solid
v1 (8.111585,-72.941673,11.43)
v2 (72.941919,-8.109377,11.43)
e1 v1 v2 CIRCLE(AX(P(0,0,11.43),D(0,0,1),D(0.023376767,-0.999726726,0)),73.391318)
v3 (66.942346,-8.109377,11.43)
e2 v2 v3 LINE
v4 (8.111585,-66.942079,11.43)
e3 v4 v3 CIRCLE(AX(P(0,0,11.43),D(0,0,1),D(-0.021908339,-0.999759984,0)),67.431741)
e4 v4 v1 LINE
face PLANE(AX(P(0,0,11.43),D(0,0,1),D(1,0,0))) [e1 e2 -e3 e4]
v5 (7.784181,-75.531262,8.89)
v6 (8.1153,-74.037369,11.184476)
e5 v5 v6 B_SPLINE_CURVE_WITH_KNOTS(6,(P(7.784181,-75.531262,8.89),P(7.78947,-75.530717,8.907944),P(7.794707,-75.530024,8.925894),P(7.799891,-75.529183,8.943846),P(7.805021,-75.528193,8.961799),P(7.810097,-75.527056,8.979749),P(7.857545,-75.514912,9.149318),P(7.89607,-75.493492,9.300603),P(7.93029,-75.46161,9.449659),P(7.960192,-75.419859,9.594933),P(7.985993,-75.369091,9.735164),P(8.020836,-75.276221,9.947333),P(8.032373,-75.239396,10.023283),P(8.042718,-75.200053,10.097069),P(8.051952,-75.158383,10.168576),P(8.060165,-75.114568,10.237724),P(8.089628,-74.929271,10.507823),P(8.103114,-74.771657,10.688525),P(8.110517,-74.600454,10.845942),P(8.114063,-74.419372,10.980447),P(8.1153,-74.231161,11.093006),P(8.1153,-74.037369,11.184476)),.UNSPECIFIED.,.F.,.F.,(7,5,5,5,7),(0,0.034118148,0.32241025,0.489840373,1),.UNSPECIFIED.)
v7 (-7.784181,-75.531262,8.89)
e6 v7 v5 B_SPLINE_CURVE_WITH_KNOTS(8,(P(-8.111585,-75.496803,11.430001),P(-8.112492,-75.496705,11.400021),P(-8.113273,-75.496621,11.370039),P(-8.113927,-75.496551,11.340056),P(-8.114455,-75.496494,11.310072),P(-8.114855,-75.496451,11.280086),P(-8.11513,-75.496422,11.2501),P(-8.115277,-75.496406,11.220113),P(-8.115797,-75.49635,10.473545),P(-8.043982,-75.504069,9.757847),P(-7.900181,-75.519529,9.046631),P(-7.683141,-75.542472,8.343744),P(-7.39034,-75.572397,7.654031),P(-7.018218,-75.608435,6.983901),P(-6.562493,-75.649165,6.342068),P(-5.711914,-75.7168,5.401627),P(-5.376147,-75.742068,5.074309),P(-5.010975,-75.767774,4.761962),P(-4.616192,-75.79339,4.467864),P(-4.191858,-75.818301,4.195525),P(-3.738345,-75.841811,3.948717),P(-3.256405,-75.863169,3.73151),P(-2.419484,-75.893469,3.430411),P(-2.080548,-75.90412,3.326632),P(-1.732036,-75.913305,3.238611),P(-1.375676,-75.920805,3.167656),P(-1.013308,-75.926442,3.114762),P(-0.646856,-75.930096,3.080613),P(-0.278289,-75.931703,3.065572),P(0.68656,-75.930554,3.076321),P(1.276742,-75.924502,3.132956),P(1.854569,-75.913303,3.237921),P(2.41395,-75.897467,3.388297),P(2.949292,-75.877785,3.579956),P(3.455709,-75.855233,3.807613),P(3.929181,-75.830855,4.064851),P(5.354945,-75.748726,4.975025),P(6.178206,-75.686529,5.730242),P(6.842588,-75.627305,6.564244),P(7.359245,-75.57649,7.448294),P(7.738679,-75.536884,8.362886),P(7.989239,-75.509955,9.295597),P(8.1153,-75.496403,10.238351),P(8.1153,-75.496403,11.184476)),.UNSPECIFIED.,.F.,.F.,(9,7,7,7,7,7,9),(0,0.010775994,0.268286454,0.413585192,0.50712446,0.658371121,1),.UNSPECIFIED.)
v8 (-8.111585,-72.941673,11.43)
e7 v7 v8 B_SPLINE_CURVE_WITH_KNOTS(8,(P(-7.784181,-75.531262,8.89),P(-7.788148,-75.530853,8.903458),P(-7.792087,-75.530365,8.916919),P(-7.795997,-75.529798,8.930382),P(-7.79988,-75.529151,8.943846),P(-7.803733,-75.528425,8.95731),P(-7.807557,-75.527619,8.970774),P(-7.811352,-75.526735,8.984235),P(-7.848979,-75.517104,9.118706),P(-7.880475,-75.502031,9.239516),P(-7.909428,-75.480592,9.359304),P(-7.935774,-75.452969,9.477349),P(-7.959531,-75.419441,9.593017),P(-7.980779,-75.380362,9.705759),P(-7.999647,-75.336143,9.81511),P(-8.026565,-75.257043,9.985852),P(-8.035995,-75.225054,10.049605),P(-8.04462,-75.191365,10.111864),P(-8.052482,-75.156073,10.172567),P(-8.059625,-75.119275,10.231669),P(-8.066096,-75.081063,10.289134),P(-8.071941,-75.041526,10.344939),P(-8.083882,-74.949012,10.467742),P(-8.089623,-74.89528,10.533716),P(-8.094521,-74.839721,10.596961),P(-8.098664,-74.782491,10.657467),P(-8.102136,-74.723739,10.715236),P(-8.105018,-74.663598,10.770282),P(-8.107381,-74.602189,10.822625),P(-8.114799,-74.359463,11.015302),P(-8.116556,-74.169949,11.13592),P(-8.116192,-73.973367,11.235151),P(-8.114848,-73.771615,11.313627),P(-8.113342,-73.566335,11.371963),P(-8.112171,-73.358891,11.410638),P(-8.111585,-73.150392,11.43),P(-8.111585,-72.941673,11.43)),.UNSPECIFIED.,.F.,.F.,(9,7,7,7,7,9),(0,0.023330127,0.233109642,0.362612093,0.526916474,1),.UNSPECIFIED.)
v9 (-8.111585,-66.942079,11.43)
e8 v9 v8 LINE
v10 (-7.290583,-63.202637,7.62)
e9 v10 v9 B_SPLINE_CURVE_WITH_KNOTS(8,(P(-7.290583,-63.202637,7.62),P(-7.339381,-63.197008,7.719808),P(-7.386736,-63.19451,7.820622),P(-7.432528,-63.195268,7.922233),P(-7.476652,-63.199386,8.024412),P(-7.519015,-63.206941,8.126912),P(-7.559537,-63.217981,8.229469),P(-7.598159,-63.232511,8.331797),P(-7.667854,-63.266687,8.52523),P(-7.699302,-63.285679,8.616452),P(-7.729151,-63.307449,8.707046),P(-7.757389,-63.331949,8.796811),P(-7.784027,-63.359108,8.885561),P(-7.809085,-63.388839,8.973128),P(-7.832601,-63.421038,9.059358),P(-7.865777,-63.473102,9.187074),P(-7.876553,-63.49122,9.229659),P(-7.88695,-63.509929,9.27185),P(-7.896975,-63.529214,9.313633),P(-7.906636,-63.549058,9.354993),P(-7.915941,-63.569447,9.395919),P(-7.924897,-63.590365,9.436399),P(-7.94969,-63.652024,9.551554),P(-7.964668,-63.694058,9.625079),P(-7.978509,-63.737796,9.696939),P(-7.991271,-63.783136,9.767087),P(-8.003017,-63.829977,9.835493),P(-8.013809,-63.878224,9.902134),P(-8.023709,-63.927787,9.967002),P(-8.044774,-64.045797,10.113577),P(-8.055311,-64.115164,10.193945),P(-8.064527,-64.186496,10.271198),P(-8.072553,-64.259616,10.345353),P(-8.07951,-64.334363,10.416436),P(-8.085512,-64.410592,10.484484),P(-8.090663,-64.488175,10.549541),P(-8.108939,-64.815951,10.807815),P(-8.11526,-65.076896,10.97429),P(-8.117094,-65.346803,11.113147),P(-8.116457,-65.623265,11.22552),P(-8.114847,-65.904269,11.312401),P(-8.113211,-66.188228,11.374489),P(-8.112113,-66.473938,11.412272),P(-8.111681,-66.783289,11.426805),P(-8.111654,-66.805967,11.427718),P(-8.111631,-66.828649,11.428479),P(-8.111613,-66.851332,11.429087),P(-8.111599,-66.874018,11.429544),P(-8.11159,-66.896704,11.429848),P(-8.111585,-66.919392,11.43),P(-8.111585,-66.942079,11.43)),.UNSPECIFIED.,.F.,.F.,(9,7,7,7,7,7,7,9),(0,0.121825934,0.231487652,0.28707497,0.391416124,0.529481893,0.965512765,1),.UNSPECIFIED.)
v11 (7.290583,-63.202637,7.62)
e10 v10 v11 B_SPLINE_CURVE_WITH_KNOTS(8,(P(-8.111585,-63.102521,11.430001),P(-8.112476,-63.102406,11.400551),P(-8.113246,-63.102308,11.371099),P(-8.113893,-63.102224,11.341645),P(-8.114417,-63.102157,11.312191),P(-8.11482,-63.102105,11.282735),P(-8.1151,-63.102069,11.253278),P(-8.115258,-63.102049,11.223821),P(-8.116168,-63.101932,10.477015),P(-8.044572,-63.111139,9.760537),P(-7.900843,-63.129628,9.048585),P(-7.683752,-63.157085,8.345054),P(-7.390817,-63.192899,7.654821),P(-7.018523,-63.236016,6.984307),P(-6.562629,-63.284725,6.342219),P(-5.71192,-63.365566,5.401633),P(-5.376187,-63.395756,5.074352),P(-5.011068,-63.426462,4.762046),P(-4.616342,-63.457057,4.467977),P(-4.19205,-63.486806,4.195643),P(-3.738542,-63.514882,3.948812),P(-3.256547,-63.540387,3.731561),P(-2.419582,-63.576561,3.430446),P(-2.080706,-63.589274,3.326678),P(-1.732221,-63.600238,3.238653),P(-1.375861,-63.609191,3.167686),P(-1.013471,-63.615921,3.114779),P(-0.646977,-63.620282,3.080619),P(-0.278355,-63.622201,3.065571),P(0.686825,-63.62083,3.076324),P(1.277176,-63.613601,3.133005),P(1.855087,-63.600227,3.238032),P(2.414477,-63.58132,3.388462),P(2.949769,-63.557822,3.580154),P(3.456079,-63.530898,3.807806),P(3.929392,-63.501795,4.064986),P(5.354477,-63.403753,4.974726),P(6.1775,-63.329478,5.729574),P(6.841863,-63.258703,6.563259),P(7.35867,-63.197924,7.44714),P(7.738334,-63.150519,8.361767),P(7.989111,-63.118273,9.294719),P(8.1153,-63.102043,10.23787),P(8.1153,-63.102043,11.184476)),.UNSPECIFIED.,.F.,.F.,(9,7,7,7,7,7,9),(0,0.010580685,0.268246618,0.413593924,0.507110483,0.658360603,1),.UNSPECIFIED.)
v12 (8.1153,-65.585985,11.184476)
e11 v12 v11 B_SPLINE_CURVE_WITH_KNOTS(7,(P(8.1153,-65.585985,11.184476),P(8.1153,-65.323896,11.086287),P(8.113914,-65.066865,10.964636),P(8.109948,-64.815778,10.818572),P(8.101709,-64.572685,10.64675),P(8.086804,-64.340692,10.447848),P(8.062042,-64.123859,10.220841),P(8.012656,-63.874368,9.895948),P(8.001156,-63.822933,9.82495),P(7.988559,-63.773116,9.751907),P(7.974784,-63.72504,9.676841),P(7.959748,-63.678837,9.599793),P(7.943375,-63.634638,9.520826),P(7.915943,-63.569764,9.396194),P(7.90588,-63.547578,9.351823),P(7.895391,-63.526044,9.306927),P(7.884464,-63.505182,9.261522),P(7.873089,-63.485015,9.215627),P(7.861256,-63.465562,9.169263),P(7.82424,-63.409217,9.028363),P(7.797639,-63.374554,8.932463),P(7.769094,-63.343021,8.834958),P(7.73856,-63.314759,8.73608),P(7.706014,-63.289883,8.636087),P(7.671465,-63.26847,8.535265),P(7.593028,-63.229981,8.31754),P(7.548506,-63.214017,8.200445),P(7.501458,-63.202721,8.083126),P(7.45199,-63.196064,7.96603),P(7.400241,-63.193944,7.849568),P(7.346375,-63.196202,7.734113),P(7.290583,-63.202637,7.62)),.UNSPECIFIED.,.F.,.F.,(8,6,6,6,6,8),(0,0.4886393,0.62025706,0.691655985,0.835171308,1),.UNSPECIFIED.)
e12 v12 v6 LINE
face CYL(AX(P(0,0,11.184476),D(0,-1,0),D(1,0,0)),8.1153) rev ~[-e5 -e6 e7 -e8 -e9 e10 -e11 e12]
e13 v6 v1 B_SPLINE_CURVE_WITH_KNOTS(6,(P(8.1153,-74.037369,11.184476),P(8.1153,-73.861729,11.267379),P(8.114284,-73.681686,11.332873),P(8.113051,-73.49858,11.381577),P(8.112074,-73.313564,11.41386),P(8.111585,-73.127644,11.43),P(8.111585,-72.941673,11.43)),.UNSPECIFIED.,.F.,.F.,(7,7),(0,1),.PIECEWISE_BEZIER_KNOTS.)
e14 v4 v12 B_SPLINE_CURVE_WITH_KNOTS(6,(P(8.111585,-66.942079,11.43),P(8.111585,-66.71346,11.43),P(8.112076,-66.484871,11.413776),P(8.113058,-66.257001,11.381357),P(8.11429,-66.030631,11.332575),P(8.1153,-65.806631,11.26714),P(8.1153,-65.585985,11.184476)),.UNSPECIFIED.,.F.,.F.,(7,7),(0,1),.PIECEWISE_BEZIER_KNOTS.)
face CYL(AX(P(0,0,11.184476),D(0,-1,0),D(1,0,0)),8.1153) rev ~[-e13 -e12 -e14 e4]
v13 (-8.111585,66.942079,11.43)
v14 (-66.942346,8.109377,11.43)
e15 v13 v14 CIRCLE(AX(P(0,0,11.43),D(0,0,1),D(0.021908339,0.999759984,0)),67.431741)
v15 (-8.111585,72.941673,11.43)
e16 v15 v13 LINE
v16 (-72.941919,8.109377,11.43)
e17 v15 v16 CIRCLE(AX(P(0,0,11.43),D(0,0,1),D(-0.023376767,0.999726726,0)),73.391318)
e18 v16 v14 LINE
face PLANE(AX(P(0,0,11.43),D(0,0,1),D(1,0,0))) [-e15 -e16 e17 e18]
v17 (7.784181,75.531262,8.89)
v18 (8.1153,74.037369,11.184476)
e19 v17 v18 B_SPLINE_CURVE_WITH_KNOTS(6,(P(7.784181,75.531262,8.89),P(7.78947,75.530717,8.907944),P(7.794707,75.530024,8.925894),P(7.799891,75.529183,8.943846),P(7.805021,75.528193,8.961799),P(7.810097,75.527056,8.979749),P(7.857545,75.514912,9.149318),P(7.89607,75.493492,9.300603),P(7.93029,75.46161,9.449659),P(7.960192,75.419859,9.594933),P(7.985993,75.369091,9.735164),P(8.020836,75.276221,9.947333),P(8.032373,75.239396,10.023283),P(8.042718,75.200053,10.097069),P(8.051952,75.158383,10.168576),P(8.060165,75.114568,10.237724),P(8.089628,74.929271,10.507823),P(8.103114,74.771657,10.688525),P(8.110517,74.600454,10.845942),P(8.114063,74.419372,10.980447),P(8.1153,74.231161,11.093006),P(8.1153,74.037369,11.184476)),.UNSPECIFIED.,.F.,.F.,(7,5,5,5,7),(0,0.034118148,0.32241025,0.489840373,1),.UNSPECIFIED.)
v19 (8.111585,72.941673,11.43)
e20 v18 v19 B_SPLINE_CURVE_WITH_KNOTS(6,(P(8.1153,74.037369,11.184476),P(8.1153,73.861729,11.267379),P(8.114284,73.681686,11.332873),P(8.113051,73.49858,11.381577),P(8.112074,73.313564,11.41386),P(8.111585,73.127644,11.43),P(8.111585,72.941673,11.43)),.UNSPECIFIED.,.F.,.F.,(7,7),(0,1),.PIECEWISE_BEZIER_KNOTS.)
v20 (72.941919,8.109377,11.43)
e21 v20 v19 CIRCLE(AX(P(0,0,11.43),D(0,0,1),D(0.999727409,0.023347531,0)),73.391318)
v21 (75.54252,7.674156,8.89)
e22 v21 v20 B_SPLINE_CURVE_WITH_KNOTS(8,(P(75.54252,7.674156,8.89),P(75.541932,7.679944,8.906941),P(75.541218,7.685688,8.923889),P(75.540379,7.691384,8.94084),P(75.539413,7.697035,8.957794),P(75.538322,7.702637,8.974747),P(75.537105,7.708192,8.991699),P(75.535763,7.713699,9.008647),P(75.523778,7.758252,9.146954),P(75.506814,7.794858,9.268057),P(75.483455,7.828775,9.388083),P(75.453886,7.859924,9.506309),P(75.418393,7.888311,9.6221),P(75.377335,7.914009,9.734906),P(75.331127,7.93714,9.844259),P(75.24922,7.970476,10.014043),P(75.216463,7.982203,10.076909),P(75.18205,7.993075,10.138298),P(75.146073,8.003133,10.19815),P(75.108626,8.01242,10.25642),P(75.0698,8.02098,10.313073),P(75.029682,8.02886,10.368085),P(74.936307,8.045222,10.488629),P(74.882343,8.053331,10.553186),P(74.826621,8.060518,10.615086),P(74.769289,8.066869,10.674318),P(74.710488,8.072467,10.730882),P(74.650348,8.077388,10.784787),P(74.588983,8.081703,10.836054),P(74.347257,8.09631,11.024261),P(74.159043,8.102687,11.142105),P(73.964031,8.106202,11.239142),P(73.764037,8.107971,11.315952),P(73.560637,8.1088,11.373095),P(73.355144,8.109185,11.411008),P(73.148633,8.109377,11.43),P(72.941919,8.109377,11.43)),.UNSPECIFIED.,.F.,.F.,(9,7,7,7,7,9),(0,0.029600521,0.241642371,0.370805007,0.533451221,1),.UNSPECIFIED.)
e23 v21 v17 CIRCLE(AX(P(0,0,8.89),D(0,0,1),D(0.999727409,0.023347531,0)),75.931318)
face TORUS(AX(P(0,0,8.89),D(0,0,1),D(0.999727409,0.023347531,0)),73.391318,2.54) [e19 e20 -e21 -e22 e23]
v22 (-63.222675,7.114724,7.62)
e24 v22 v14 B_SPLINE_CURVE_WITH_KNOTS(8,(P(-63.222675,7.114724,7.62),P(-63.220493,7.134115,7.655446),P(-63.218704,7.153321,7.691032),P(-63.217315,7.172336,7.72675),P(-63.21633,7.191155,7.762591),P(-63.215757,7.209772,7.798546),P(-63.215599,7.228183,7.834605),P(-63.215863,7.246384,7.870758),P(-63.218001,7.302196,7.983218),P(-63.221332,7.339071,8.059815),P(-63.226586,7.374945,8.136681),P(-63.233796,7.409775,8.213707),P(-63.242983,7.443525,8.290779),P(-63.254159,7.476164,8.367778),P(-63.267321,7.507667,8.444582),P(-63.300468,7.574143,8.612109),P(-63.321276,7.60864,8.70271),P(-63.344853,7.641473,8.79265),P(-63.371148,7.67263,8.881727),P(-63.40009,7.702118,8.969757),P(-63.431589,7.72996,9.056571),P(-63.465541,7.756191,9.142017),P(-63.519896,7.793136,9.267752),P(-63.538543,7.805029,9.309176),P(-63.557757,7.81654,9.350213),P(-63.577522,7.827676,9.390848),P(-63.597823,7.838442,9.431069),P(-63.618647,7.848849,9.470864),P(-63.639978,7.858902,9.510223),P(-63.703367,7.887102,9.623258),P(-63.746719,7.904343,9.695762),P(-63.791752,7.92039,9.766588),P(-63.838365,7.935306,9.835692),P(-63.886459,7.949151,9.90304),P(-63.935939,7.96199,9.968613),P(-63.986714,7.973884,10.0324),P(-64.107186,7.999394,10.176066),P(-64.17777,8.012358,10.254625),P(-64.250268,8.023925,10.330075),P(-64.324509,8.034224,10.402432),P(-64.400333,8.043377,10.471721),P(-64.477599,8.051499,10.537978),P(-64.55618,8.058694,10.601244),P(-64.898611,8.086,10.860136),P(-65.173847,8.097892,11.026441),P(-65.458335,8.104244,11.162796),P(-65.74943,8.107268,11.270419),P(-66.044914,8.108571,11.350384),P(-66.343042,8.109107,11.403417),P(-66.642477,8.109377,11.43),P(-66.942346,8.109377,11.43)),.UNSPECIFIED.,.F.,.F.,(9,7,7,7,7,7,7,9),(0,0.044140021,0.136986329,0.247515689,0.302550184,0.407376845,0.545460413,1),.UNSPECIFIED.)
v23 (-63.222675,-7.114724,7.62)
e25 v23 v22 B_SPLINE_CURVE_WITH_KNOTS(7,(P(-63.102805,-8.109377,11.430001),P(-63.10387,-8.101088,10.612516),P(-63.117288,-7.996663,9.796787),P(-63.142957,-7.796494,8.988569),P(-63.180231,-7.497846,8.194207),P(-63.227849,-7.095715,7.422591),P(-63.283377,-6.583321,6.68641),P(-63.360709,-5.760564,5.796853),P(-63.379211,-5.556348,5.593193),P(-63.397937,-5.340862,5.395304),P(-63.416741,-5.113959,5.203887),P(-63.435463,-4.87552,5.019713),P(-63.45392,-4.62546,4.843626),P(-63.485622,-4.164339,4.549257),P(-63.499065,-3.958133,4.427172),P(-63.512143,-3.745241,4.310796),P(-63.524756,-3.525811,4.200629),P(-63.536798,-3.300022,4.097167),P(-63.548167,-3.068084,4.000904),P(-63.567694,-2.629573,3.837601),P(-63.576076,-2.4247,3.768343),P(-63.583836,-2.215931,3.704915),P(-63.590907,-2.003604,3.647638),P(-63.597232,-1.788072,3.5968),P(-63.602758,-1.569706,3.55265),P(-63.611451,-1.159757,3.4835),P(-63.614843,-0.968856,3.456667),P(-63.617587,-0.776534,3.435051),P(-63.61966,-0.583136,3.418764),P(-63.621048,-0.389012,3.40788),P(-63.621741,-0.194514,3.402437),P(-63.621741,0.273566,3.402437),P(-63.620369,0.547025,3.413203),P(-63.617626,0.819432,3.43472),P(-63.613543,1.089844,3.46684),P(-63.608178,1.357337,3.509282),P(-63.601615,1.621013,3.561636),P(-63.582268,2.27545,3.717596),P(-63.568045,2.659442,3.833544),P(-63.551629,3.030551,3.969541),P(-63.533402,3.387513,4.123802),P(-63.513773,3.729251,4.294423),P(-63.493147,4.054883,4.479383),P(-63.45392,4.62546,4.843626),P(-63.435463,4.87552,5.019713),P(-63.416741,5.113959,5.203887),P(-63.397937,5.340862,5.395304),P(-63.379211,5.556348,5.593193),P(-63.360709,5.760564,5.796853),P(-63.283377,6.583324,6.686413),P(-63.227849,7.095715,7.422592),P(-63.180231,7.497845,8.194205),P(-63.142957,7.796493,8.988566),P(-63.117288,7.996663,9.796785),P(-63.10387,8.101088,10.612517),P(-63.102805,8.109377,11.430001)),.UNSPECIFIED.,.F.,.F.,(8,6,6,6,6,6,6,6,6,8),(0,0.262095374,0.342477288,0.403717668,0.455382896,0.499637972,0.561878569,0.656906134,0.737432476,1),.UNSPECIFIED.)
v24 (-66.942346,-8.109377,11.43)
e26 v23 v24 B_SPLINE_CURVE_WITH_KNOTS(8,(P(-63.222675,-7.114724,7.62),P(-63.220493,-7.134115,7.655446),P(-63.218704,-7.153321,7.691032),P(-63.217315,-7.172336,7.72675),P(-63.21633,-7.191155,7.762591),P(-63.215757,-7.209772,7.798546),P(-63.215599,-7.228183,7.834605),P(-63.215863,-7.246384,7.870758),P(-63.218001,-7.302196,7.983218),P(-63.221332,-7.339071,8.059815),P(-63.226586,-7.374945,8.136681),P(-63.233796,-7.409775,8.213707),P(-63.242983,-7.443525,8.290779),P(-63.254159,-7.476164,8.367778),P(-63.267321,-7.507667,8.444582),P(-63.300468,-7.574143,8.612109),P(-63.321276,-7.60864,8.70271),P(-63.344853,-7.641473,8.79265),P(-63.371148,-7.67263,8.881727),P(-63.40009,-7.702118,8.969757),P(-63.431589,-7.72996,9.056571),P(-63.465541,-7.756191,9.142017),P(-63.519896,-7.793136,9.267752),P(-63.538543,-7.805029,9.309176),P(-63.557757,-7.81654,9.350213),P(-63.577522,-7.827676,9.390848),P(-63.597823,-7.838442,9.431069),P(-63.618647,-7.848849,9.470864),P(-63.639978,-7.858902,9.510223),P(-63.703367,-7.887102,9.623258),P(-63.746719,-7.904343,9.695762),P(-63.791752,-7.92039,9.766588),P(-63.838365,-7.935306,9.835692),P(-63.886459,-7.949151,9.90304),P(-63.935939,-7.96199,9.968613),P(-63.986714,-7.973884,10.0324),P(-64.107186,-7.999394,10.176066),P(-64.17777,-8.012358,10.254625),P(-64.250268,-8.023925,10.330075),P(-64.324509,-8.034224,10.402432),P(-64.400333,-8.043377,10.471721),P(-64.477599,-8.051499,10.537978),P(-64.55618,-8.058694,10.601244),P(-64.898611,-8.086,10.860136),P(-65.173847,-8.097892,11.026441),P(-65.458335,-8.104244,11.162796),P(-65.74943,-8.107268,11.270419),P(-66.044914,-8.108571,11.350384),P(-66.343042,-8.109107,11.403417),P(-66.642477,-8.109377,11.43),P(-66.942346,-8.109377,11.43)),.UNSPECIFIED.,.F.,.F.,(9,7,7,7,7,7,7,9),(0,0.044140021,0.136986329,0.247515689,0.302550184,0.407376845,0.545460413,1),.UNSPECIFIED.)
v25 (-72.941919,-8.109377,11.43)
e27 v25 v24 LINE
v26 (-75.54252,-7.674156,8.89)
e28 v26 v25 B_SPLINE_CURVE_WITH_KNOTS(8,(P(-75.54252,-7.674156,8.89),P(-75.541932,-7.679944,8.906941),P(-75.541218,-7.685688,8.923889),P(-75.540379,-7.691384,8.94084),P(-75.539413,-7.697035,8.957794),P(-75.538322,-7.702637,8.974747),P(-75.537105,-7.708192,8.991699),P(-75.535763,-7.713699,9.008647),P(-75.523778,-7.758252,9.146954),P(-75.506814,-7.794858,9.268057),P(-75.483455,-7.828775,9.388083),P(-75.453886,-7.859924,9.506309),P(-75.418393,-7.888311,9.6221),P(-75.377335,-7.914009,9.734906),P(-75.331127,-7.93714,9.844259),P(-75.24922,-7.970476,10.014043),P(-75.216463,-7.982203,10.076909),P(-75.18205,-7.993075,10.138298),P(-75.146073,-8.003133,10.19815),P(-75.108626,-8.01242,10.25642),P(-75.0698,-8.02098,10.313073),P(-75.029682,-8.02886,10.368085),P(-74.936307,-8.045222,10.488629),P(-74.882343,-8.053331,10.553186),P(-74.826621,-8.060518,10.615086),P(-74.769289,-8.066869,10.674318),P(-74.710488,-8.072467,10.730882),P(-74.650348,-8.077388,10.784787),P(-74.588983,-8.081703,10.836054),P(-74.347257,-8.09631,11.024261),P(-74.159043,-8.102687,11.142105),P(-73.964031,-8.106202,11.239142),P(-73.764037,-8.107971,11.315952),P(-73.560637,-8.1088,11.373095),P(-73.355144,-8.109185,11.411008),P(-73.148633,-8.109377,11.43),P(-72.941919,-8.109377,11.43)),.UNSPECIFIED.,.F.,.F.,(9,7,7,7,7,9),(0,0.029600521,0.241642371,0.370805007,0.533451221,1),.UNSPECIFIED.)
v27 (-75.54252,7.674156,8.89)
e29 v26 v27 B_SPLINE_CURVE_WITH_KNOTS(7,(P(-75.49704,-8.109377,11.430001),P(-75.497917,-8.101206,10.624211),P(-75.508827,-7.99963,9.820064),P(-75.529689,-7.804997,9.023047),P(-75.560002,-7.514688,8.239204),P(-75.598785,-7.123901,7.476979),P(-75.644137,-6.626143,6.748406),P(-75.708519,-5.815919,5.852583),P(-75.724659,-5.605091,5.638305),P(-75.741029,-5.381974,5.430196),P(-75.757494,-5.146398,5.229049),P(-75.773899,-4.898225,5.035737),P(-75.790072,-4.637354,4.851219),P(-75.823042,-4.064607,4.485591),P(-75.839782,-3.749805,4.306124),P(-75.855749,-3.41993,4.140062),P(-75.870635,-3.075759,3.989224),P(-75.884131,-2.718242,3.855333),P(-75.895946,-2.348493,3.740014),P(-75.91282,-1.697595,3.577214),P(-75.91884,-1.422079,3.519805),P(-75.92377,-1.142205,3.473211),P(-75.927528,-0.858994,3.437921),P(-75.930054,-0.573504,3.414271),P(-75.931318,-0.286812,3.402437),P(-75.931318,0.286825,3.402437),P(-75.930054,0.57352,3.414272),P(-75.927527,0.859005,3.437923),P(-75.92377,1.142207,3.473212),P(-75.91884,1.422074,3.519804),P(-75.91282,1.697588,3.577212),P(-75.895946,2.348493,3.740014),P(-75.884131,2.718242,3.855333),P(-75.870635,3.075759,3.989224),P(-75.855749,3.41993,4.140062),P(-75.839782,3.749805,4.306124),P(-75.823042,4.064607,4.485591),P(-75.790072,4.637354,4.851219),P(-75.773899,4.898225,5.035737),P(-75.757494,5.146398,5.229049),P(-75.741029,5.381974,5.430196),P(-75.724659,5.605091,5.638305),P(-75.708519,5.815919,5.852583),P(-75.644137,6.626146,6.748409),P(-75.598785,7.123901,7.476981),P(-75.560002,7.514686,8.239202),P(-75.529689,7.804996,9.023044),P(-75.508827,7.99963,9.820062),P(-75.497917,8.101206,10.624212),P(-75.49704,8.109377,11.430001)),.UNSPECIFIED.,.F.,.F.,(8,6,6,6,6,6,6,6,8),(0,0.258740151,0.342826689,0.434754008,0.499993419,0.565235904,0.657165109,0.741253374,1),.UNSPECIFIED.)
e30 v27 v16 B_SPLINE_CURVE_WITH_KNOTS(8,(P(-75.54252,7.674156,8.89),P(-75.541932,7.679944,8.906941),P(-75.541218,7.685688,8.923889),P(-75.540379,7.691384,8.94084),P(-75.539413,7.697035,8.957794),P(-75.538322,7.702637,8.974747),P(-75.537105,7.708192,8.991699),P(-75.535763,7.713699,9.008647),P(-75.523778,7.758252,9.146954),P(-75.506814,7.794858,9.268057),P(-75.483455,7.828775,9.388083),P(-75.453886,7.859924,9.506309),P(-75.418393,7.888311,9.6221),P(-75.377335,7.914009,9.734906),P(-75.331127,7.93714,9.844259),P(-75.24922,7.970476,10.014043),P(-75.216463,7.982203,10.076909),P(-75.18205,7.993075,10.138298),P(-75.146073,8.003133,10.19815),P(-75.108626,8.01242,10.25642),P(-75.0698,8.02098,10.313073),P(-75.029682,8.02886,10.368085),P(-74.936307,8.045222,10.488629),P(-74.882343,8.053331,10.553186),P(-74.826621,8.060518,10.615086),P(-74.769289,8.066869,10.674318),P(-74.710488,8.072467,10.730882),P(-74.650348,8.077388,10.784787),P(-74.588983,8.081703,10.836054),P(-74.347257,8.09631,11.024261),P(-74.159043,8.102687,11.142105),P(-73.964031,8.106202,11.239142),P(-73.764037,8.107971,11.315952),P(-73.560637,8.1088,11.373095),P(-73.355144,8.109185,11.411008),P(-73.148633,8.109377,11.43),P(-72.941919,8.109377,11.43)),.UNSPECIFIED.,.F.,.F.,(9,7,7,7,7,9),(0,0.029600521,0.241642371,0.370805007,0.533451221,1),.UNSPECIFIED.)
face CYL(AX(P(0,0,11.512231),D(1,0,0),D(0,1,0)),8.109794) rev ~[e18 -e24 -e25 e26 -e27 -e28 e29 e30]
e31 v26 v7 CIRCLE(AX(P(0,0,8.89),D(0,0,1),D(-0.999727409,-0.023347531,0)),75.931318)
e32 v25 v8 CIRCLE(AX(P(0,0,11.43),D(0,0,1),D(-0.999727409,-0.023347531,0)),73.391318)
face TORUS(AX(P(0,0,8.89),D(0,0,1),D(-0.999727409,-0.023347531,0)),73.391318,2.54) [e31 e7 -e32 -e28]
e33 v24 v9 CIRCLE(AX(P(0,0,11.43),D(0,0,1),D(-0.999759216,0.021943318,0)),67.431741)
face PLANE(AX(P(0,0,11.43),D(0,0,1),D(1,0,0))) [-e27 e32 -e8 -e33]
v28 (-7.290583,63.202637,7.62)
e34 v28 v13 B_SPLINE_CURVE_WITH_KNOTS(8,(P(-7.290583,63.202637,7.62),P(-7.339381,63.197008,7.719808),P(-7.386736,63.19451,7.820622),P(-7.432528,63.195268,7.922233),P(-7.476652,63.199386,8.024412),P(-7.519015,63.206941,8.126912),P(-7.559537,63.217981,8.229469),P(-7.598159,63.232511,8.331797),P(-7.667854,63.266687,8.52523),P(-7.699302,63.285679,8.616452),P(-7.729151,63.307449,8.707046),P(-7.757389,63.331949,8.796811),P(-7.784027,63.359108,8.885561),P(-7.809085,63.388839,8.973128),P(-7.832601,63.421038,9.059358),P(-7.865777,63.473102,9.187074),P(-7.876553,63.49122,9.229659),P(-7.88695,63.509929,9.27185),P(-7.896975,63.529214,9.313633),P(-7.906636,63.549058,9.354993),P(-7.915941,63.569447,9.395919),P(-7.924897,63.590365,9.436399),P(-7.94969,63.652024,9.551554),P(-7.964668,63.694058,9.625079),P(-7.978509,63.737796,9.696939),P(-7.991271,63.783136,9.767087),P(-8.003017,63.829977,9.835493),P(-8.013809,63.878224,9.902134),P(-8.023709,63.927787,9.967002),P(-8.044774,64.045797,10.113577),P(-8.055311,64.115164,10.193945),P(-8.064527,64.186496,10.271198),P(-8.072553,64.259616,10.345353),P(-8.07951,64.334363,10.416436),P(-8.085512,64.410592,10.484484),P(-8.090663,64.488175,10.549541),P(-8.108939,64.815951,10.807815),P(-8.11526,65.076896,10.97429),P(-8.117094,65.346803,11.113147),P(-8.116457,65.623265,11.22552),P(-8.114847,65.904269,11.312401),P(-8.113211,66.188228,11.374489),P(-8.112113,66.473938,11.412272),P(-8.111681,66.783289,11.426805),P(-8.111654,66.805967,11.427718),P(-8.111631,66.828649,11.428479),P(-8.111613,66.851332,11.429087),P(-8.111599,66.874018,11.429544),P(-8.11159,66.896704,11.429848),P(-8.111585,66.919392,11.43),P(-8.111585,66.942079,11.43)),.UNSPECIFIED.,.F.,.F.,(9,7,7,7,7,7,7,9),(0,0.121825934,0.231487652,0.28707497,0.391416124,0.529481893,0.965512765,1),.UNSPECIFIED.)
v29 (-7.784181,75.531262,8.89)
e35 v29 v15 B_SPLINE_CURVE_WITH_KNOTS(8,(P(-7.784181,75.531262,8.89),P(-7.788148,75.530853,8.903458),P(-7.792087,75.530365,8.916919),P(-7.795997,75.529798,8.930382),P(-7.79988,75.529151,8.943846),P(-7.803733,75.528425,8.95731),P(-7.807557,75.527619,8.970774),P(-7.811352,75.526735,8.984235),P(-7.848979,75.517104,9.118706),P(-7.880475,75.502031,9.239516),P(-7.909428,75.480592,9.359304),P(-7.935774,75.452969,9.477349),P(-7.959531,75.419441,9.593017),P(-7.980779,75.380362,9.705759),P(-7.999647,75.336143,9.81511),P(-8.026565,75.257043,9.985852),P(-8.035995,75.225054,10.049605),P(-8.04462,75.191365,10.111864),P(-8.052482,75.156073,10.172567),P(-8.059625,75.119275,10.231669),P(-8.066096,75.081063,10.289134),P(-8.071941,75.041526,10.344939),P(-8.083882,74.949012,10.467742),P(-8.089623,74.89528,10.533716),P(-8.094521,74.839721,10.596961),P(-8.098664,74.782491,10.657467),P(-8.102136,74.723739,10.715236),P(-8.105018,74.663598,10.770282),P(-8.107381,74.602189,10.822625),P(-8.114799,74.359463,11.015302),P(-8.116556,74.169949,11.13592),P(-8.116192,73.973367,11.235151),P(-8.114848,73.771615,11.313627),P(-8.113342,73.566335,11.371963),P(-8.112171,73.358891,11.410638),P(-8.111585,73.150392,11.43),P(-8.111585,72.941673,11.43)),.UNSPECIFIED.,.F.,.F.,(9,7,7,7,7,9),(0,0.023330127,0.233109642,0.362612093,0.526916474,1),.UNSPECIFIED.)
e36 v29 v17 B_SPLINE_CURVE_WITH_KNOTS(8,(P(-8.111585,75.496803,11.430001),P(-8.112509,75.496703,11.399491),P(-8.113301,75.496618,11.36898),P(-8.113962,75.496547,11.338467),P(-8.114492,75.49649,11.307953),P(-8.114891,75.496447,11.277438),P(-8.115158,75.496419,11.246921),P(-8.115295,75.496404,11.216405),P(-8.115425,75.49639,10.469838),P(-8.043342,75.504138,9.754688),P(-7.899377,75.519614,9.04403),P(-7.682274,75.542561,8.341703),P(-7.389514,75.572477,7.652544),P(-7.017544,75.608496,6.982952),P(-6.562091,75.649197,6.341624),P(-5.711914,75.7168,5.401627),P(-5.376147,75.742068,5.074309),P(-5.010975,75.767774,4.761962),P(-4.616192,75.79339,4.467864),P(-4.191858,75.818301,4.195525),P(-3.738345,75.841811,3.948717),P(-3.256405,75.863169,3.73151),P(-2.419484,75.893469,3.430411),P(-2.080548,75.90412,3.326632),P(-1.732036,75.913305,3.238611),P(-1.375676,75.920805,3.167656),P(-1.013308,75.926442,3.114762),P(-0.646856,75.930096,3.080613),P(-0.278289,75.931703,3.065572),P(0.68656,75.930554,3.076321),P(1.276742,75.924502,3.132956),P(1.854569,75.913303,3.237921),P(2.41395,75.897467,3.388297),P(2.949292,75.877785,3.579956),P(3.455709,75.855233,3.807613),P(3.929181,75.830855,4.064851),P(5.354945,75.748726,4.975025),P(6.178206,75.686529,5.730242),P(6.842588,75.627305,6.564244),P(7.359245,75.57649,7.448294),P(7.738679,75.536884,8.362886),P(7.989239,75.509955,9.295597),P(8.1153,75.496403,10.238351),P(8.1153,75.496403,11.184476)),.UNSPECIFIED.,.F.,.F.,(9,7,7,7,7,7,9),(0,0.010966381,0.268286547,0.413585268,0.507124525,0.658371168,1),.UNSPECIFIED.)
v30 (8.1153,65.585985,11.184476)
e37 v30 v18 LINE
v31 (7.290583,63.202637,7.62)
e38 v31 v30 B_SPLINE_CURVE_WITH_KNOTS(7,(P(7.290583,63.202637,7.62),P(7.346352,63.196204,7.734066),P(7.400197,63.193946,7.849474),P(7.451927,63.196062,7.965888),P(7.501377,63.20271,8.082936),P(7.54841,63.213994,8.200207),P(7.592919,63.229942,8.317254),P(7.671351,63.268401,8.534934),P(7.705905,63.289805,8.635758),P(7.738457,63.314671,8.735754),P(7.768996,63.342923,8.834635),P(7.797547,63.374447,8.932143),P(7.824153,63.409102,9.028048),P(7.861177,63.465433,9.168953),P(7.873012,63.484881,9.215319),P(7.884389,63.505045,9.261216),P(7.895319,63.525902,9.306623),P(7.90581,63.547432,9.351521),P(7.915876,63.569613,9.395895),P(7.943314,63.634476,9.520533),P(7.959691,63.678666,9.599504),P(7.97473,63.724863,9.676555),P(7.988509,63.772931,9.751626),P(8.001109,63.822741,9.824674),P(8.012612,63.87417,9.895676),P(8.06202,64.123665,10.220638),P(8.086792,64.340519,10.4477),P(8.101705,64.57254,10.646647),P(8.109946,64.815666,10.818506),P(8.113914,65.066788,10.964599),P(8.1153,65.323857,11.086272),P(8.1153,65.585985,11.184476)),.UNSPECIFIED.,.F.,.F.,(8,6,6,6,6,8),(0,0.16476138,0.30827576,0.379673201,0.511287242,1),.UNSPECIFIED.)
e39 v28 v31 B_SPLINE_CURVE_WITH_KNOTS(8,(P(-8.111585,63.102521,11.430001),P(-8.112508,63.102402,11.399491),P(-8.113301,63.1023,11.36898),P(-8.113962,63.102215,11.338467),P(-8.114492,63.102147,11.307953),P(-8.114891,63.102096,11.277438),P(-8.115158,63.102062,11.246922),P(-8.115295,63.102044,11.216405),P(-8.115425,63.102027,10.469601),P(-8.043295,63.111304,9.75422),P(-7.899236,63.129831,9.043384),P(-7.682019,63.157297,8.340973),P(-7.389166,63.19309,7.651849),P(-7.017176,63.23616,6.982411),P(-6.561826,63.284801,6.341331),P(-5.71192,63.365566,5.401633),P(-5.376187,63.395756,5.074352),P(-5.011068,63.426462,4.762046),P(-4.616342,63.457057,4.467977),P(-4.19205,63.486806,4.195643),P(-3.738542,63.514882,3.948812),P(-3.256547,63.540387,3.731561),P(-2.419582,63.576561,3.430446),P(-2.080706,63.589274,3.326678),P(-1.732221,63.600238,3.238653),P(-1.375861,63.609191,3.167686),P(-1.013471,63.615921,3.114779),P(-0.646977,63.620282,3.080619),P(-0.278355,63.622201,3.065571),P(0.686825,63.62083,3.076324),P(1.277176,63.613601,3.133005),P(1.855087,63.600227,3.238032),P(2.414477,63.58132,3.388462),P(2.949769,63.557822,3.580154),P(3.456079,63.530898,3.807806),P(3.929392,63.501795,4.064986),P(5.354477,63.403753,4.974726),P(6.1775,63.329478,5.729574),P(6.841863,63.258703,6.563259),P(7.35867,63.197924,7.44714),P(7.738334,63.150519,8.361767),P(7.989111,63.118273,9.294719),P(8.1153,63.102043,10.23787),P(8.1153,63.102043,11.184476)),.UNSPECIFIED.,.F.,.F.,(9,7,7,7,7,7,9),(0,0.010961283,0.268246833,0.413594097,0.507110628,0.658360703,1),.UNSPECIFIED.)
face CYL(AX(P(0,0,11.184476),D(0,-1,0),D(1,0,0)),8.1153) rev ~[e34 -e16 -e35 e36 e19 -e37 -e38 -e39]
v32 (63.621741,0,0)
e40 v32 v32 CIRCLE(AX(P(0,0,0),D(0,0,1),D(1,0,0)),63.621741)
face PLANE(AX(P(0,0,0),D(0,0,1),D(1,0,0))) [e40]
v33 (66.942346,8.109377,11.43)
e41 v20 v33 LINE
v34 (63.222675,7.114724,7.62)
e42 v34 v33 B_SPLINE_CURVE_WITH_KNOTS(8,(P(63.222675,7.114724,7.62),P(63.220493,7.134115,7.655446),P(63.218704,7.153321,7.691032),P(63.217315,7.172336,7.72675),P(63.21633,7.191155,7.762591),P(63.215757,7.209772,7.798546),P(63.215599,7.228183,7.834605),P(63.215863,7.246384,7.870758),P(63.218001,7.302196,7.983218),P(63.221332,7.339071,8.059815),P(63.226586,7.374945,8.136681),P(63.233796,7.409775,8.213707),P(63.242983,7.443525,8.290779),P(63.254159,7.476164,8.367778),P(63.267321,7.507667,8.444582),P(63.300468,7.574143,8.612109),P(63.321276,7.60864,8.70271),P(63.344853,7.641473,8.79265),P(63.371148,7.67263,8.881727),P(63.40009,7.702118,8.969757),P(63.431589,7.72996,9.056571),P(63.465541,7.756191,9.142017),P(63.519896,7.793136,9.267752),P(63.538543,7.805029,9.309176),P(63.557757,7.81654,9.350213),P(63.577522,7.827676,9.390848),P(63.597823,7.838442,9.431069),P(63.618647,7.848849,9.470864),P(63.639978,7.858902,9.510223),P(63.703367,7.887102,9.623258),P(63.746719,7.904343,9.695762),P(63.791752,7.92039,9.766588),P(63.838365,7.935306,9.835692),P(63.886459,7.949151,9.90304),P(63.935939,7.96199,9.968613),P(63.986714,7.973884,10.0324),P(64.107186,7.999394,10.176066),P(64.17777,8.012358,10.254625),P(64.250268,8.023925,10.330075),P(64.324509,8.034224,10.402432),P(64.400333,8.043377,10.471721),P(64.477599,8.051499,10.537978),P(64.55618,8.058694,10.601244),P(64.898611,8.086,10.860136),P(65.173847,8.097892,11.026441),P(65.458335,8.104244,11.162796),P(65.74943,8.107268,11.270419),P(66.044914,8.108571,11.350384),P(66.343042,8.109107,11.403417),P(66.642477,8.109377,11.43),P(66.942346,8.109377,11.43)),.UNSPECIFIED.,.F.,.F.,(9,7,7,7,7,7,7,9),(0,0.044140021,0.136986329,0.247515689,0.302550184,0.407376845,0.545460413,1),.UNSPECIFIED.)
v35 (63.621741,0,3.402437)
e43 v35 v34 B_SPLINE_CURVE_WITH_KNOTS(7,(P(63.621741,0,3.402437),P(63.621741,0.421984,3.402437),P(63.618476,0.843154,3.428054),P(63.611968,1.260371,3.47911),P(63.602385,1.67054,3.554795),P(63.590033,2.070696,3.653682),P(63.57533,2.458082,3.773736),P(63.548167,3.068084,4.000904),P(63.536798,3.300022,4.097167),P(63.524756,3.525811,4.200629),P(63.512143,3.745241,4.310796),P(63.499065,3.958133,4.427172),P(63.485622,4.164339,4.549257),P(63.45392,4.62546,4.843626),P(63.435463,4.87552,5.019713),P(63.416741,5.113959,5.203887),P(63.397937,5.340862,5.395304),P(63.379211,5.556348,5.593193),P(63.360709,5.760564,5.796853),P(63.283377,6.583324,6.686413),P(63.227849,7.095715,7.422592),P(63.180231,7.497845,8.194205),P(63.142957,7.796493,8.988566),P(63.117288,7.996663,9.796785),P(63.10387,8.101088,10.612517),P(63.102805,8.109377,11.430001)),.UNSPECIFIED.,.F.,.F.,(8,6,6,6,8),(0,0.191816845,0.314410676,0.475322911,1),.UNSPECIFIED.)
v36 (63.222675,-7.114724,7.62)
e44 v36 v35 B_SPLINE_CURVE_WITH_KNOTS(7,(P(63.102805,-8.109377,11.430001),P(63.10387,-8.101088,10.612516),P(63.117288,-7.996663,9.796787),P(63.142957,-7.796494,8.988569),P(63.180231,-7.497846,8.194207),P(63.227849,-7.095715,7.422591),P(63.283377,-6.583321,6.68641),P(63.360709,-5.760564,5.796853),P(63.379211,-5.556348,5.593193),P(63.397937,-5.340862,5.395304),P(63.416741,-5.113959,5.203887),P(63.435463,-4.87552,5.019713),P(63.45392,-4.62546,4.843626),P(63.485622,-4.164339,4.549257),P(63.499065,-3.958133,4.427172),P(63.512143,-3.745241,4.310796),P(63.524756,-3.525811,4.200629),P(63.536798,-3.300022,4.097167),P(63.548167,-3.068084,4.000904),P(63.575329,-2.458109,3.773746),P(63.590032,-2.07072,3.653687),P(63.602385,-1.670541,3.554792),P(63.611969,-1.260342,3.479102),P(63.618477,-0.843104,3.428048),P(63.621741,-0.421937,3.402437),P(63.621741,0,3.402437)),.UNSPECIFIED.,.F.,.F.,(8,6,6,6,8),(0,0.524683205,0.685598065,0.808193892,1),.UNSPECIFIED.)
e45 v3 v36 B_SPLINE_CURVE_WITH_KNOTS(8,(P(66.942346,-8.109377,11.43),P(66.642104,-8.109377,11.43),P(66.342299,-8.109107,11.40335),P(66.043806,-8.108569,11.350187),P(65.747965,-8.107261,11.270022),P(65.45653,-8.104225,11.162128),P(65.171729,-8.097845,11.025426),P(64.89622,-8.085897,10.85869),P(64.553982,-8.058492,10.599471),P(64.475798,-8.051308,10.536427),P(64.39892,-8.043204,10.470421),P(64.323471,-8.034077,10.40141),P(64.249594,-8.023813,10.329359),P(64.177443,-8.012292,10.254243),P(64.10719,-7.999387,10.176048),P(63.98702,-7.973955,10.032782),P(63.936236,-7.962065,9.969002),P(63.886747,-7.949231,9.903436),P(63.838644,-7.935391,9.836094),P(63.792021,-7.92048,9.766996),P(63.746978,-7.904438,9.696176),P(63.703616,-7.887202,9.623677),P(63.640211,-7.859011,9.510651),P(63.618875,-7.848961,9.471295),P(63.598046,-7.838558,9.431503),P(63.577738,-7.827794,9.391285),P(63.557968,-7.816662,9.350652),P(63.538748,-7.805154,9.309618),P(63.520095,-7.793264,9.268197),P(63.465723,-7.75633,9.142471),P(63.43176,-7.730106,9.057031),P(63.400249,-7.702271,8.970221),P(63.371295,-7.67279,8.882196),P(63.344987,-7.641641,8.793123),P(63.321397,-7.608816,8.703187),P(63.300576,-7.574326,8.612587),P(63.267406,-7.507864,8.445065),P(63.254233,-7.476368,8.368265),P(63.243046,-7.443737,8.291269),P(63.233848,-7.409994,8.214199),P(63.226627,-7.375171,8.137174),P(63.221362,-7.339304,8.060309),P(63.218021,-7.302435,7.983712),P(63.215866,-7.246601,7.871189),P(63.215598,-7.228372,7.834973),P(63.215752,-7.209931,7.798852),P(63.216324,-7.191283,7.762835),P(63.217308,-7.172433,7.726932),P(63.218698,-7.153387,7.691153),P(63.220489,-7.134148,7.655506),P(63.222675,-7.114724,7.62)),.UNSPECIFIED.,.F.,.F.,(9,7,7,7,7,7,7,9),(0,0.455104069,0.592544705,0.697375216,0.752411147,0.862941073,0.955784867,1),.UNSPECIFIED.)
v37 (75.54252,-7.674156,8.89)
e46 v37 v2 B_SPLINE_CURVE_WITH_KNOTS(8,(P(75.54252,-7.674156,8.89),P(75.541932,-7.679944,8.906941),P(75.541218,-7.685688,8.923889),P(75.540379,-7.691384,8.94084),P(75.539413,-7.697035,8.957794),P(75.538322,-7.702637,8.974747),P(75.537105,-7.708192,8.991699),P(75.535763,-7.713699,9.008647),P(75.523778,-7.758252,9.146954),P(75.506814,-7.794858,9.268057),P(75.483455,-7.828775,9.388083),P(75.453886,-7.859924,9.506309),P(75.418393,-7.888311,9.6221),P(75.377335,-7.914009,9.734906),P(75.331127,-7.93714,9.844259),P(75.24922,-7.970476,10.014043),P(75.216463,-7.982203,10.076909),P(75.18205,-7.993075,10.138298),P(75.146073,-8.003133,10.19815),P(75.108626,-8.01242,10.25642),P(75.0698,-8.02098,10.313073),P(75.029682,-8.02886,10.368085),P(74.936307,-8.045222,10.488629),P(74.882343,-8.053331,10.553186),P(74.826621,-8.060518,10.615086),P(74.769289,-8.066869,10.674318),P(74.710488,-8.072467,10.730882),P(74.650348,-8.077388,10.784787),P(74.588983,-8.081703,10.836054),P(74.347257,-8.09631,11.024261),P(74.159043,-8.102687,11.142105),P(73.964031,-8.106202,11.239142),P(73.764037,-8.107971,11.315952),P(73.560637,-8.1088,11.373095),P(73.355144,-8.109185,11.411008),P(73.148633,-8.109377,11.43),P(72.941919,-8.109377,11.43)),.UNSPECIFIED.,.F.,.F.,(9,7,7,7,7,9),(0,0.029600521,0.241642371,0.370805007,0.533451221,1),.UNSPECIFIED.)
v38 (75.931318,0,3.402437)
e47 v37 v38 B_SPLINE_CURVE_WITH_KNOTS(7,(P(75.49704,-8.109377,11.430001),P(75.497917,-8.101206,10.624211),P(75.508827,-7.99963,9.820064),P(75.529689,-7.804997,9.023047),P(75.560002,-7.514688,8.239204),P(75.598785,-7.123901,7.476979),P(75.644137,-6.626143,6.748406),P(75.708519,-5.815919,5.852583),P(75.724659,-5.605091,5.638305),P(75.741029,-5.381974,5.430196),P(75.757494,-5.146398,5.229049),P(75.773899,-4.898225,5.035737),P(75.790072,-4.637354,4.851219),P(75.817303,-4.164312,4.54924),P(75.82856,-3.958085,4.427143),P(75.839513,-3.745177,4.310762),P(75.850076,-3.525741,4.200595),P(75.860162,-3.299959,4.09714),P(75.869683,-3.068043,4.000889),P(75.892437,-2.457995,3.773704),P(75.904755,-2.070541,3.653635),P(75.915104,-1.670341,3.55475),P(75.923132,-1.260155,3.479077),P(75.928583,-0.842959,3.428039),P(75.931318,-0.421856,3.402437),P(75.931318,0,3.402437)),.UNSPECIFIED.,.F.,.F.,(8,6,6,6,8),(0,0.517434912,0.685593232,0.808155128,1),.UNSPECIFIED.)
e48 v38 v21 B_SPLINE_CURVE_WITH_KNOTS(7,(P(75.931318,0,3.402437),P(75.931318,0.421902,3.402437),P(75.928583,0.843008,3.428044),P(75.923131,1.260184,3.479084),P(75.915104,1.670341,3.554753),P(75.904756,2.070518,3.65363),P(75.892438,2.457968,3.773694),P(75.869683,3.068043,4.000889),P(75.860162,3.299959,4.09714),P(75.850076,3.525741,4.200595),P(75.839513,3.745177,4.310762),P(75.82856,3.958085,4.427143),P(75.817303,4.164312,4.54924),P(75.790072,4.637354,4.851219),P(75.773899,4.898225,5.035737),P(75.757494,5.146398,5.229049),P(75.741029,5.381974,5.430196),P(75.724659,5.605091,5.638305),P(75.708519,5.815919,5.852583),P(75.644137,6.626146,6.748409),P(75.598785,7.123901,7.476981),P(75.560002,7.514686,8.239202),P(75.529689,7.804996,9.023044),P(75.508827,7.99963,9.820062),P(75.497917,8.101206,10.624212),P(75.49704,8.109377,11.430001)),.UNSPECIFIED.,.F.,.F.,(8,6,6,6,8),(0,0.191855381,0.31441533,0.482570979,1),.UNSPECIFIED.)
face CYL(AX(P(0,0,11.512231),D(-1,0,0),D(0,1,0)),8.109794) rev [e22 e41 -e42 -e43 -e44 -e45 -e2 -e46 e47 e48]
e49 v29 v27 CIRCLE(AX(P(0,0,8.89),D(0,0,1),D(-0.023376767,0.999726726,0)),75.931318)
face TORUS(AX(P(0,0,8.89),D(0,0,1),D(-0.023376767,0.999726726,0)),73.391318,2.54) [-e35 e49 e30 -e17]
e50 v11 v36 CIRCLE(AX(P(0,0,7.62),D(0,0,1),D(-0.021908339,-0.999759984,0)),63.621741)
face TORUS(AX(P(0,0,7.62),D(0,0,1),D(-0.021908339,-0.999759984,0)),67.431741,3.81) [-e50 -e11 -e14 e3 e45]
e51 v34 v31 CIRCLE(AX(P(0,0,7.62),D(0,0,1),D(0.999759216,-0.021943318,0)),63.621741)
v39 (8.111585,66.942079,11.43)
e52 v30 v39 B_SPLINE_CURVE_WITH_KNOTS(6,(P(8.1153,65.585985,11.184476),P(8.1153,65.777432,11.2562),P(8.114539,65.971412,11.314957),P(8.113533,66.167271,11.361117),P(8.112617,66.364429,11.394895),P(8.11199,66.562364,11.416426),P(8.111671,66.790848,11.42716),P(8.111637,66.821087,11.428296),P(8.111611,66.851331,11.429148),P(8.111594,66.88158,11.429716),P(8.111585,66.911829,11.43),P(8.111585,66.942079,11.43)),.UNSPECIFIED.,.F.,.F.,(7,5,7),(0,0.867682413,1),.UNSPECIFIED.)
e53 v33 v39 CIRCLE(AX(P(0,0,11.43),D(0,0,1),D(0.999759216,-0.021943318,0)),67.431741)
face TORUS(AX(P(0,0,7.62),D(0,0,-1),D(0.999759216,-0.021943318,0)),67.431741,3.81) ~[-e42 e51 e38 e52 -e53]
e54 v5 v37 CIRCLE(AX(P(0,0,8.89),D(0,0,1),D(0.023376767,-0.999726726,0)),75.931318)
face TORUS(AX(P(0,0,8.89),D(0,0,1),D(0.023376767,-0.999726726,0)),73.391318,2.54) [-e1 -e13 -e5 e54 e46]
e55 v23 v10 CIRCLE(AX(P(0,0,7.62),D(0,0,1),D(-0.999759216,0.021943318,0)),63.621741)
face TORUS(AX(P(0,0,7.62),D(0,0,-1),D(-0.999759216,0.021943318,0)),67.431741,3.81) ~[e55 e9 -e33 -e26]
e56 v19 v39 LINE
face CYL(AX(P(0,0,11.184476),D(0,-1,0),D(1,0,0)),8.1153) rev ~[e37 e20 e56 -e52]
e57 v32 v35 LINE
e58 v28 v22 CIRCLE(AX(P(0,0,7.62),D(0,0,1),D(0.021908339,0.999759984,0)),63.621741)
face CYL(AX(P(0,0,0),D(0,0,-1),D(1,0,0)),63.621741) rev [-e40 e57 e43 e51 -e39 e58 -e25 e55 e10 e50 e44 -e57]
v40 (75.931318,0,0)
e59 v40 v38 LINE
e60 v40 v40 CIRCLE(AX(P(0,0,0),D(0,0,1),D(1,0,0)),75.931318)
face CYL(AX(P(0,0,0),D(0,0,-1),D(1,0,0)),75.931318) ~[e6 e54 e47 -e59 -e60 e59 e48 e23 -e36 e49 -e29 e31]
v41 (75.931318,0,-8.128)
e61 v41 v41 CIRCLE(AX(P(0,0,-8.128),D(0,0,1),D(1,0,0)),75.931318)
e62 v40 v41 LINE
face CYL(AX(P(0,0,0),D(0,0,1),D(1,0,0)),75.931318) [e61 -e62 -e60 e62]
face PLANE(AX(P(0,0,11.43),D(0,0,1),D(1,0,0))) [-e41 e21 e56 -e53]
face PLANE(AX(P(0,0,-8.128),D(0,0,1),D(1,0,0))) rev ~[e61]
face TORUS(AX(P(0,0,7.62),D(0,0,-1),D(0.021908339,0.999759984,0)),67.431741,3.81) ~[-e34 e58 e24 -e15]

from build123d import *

# Parameters (mm, degrees)
F0_R         = 75.9313176518
F0_R_2       = 63.6217413668
F1_DEPTH     = 8.128
F2_DEPTH     = 11.43
F3_R         = 8.1097941577
F4_DEPTH     = 100.33
F5_DEPTH     = 117.094
F6_R         = 8.1153
F7_DEPTH     = 85.852
F8_DEPTH     = 117.094
F9_T2_ANGLE  = 87.3226513318
F9_T4_ANGLE  = 87.3226513318
F9_T6_ANGLE  = 87.3226513318
F9_T8_ANGLE  = 87.3226513318
F10_T2_ANGLE = 92.5127162525
F10_T4_ANGLE = 92.5127162525
F10_T6_ANGLE = 92.5127162525
F10_T8_ANGLE = 92.5127162525


# Not quite as in the source:
# - a fillet or chamfer that OpenCascade refuses, or shapes differently, is made with other operations: its cross-section is extruded or revolved along the edge and cut away or added


with BuildPart() as f1:
    # F0 (on Top) → F1 (new body)
    with BuildSketch(Plane.XY):
        Circle(F0_R)
        Circle(F0_R_2, mode=Mode.SUBTRACT)
        Circle(F0_R_2)
    extrude(amount=-F1_DEPTH)

    # F0 (on Top) → F2 (join)
    with BuildSketch(Plane.XY):
        Circle(F0_R)
        Circle(F0_R_2, mode=Mode.SUBTRACT)
    extrude(amount=F2_DEPTH)

    # F3 (on Right) → F4 (cut)
    with BuildSketch(Plane.YZ):
        with Locations((0, 11.5122310817)):
            Circle(F3_R)
    extrude(amount=-F4_DEPTH, mode=Mode.SUBTRACT)

    # F3 (on Right) → F5 (cut)
    with BuildSketch(Plane.YZ):
        with Locations((0, 11.5122310817)):
            Circle(F3_R)
    extrude(amount=F5_DEPTH, mode=Mode.SUBTRACT)

    # F6 (on Front) → F7 (cut)
    with BuildSketch(Plane.XZ):
        with Locations((0, 11.1844760826)):
            Circle(F6_R)
    extrude(amount=-F7_DEPTH, mode=Mode.SUBTRACT)

    # F6 (on Front) → F8 (cut, symmetric)
    with BuildSketch(Plane.XZ):
        with Locations((0, 11.1844760826)):
            Circle(F6_R)
    extrude(amount=F8_DEPTH, both=True, mode=Mode.SUBTRACT)

    # F9: fillet of radius 2.54 on 4 edges, made by hand

    # F9_s1 → F9_t2 (revolve, cut)
    with BuildSketch(Plane(origin=(0, 0, 0), x_dir=(0, 0, 1), z_dir=(-0.999726726, -0.0233767669, 0))):
        with BuildLine():
            ThreePointArc((8.89, -75.9313176518), (10.6860512242, -75.187368876), (11.43, -73.3913176518))
            Line((11.43, -73.3913176518), (11.43, -75.9313176518))
            Line((11.43, -75.9313176518), (8.89, -75.9313176518))
        make_face()
    revolve(axis=Axis((0, 0, 11.43), (0, 0, 1)), revolution_arc=F9_T2_ANGLE, mode=Mode.SUBTRACT)

    # F9_s3 → F9_t4 (revolve, cut)
    with BuildSketch(Plane(origin=(0, 0, 0), x_dir=(0, 0, 1), z_dir=(-0.0233475312, 0.9997274092, 0))):
        with BuildLine():
            ThreePointArc((8.89, -75.9313176518), (10.6860512242, -75.187368876), (11.43, -73.3913176518))
            Line((11.43, -73.3913176518), (11.43, -75.9313176518))
            Line((11.43, -75.9313176518), (8.89, -75.9313176518))
        make_face()
    revolve(axis=Axis((0, 0, 11.43), (0, 0, 1)), revolution_arc=F9_T4_ANGLE, mode=Mode.SUBTRACT)

    # F9_s5 → F9_t6 (revolve, cut)
    with BuildSketch(Plane(origin=(0, 0, 0), x_dir=(0, 0, 1), z_dir=(0.999726726, 0.0233767669, 0))):
        with BuildLine():
            ThreePointArc((8.89, -75.9313176518), (10.6860512242, -75.187368876), (11.43, -73.3913176518))
            Line((11.43, -73.3913176518), (11.43, -75.9313176518))
            Line((11.43, -75.9313176518), (8.89, -75.9313176518))
        make_face()
    revolve(axis=Axis((0, 0, 11.43), (0, 0, 1)), revolution_arc=F9_T6_ANGLE, mode=Mode.SUBTRACT)

    # F9_s7 → F9_t8 (revolve, cut)
    with BuildSketch(Plane(origin=(0, 0, 0), x_dir=(0, 0, 1), z_dir=(0.0233475312, -0.9997274092, 0))):
        with BuildLine():
            ThreePointArc((8.89, -75.9313176518), (10.6860512242, -75.187368876), (11.43, -73.3913176518))
            Line((11.43, -73.3913176518), (11.43, -75.9313176518))
            Line((11.43, -75.9313176518), (8.89, -75.9313176518))
        make_face()
    revolve(axis=Axis((0, 0, 11.43), (0, 0, 1)), revolution_arc=F9_T8_ANGLE, mode=Mode.SUBTRACT)

    # F10: fillet of radius 3.81 on 4 edges, made by hand

    # F10_s1 → F10_t2 (revolve, cut)
    with BuildSketch(Plane(origin=(0, 0, 0), x_dir=(0, 0, 1), z_dir=(-0.9997599835, 0.0219083392, 0))):
        with BuildLine():
            ThreePointArc((11.43, -67.4317413668), (10.3140768363, -64.7376645305), (7.62, -63.6217413668))
            Line((7.62, -63.6217413668), (11.43, -63.6217413668))
            Line((11.43, -63.6217413668), (11.43, -67.4317413668))
        make_face()
    revolve(axis=Axis((0, 0, 11.43), (0, 0, 1)), revolution_arc=F10_T2_ANGLE, mode=Mode.SUBTRACT)

    # F10_s3 → F10_t4 (revolve, cut)
    with BuildSketch(Plane(origin=(0, 0, 0), x_dir=(0, 0, 1), z_dir=(-0.0219433183, -0.9997592164, 0))):
        with BuildLine():
            ThreePointArc((7.62, -63.6217413668), (10.3140768363, -64.7376645305), (11.43, -67.4317413668))
            Line((11.43, -67.4317413668), (11.43, -63.6217413668))
            Line((11.43, -63.6217413668), (7.62, -63.6217413668))
        make_face()
    revolve(axis=Axis((0, 0, 11.43), (0, 0, 1)), revolution_arc=F10_T4_ANGLE, mode=Mode.SUBTRACT)

    # F10_s5 → F10_t6 (revolve, cut)
    with BuildSketch(Plane(origin=(0, 0, 0), x_dir=(0, 0, 1), z_dir=(0.9997599835, -0.0219083392, 0))):
        with BuildLine():
            ThreePointArc((7.62, -63.6217413668), (10.3140768363, -64.7376645305), (11.43, -67.4317413668))
            Line((11.43, -67.4317413668), (11.43, -63.6217413668))
            Line((11.43, -63.6217413668), (7.62, -63.6217413668))
        make_face()
    revolve(axis=Axis((0, 0, 11.43), (0, 0, 1)), revolution_arc=F10_T6_ANGLE, mode=Mode.SUBTRACT)

    # F10_s7 → F10_t8 (revolve, cut)
    with BuildSketch(Plane(origin=(0, 0, 0), x_dir=(0, 0, 1), z_dir=(0.0219433183, 0.9997592164, 0))):
        with BuildLine():
            ThreePointArc((7.62, -63.6217413668), (10.3140768363, -64.7376645305), (11.43, -67.4317413668))
            Line((11.43, -67.4317413668), (11.43, -63.6217413668))
            Line((11.43, -63.6217413668), (7.62, -63.6217413668))
        make_face()
    revolve(axis=Axis((0, 0, 11.43), (0, 0, 1)), revolution_arc=F10_T8_ANGLE, mode=Mode.SUBTRACT)


solid = f1.part
